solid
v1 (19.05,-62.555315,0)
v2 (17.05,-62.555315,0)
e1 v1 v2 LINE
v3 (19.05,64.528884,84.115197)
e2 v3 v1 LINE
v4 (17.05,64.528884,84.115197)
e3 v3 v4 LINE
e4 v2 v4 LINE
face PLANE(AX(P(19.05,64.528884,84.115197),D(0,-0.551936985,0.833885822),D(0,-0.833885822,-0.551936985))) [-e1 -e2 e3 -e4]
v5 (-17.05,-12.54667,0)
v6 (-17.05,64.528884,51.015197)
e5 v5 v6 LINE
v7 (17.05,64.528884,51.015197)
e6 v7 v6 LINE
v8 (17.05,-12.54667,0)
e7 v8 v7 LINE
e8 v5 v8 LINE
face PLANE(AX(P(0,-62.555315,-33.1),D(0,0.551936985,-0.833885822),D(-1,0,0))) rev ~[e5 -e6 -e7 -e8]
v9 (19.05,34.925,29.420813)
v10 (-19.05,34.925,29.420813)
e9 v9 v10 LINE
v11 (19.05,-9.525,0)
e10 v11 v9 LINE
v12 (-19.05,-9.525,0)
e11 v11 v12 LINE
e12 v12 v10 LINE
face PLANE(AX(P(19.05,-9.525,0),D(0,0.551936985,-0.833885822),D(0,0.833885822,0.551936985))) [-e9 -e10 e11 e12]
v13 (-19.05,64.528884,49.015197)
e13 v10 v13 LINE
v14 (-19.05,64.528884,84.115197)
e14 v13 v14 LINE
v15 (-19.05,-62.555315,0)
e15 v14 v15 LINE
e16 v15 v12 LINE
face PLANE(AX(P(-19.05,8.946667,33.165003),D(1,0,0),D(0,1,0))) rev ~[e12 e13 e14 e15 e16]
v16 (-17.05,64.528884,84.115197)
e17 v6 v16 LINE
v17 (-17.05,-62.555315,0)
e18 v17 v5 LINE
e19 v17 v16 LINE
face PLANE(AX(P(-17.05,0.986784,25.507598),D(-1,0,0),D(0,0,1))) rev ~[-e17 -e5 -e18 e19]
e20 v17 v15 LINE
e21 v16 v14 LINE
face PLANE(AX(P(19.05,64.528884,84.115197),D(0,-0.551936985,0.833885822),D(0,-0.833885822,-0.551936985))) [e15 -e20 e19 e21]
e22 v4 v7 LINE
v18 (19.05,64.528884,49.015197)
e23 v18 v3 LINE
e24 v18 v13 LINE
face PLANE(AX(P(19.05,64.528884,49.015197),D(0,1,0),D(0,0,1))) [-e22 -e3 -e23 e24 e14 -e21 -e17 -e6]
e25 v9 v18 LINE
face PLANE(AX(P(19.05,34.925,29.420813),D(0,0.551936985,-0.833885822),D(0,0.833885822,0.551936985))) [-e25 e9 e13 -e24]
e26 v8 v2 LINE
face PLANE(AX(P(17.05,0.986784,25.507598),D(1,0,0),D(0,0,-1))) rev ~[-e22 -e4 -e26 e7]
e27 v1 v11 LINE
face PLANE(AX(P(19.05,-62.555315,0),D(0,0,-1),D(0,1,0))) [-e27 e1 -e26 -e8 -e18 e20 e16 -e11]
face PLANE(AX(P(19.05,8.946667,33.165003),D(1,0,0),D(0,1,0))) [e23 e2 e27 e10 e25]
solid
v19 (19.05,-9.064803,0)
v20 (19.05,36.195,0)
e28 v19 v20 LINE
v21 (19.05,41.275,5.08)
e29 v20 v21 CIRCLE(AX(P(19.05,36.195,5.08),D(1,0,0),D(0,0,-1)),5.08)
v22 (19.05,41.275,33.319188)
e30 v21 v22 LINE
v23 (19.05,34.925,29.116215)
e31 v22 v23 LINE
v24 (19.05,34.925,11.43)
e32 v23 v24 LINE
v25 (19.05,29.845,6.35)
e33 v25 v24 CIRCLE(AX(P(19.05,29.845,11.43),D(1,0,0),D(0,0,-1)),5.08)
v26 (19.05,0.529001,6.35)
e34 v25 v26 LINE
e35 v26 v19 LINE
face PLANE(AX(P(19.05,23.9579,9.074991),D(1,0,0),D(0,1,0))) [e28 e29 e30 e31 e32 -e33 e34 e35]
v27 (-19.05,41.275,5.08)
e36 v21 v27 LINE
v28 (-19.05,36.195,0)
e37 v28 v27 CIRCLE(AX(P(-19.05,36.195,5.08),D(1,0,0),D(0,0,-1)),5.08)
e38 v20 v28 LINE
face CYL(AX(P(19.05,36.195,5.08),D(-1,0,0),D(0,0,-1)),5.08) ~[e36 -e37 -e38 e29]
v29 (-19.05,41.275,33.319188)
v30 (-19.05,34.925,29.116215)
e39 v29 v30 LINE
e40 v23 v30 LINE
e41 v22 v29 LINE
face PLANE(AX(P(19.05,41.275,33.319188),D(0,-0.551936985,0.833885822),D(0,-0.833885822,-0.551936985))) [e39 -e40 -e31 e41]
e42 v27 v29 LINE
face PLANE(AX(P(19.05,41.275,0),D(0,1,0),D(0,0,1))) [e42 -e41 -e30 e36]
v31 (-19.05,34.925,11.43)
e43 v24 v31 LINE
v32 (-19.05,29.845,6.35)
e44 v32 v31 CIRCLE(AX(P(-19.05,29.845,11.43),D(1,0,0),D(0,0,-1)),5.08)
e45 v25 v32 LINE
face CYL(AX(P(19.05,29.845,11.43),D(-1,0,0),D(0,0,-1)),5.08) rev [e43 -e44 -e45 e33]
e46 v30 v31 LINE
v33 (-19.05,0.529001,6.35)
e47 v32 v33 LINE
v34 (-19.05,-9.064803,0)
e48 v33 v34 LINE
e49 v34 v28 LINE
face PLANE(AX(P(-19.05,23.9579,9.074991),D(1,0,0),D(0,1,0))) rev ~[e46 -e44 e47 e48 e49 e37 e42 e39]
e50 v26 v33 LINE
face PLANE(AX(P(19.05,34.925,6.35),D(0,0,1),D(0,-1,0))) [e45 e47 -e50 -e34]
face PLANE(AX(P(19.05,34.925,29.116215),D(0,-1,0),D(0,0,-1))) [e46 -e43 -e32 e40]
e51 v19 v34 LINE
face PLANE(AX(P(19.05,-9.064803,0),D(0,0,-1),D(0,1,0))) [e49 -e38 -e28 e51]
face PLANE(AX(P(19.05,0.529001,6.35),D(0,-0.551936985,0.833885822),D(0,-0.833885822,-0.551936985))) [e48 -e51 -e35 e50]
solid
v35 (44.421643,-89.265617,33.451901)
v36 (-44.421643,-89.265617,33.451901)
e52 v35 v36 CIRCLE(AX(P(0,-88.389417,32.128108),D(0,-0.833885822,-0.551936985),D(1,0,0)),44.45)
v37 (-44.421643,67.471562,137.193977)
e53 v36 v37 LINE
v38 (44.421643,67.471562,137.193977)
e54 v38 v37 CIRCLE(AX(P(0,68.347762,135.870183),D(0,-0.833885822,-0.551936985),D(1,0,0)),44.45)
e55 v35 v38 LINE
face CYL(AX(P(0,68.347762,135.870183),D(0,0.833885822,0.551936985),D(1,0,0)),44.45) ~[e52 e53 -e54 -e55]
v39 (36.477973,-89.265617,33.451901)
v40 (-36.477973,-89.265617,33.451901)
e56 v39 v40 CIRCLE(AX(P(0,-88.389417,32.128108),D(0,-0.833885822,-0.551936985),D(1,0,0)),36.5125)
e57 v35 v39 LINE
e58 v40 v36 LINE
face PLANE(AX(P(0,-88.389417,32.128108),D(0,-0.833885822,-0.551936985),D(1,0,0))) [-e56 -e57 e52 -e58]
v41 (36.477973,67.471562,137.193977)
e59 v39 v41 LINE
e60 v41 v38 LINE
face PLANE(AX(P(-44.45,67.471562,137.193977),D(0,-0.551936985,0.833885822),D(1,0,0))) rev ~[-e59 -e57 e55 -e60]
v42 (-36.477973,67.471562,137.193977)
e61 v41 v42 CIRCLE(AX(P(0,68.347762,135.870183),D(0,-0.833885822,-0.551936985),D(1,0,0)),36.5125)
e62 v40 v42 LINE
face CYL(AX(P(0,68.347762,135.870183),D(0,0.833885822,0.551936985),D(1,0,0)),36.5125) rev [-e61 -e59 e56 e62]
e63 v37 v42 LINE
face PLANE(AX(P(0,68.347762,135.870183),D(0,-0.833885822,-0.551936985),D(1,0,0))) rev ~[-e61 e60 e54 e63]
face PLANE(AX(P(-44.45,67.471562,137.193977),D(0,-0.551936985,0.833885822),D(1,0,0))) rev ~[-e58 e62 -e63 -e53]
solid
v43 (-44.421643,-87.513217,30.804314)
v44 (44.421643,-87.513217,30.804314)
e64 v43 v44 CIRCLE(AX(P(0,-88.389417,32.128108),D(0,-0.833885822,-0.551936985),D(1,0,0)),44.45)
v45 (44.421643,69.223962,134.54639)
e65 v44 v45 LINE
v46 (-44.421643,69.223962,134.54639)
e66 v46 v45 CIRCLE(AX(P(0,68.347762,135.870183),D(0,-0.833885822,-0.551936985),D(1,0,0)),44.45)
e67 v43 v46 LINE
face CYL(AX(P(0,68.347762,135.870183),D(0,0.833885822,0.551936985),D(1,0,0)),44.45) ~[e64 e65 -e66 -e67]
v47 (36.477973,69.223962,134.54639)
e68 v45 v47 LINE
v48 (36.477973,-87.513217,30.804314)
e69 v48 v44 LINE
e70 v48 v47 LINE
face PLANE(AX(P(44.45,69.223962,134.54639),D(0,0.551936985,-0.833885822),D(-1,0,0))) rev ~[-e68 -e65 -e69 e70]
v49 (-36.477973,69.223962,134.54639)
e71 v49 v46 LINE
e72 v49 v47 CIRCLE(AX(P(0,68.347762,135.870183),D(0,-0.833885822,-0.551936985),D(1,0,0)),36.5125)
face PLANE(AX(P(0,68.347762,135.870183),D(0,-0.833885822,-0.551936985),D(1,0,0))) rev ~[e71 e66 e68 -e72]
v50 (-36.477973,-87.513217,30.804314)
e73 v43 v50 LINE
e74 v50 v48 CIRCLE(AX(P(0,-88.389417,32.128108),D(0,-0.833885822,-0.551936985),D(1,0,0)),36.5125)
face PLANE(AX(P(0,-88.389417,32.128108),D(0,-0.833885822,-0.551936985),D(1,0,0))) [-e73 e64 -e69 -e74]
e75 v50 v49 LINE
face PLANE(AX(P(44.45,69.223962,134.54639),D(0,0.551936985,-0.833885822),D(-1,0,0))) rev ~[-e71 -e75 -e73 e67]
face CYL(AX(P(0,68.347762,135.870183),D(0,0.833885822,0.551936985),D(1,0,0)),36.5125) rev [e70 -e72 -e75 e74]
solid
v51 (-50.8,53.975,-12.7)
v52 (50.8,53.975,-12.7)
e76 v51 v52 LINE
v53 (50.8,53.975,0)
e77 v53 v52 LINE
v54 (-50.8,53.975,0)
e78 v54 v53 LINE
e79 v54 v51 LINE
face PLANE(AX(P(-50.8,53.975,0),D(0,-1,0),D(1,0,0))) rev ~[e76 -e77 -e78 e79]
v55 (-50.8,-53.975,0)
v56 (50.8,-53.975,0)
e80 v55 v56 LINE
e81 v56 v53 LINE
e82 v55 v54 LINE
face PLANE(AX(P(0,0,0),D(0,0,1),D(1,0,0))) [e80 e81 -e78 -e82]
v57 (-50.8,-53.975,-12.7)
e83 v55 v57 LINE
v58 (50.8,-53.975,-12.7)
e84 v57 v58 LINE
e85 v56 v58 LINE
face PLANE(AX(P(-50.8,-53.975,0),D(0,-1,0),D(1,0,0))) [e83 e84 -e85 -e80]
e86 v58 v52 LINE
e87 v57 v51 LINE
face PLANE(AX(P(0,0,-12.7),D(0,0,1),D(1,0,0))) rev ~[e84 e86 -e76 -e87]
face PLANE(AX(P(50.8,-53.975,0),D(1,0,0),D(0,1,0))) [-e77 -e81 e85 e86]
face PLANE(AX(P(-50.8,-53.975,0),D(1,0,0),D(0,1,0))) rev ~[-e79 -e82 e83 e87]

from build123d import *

# Parameters (mm, degrees)
F0_W      = 101.6
F0_H      = 107.95
F1_DEPTH  = 12.7
F4_DEPTH  = 38.1
F5_W      = 34.1
F5_H      = 33.1
F7_R      = 5.08
F10_R     = 44.45
F10_R_2   = 36.5125
F11_DEPTH = 187.96
F13_DEPTH = 233.1615109833


with BuildPart() as f1:
    # F0 (on Top) → F1 (new body)
    with BuildSketch(Plane.XY):
        Rectangle(F0_W, F0_H)
    extrude(amount=-F1_DEPTH)


with BuildPart() as f4:
    # F3 (on offset) → F4 (new body)
    with BuildSketch(Plane.YZ.offset(19.05)):
        Polygon((64.5288839872, 84.1151965616), (-62.5553152959, 0), (-9.525, 0), (34.925, 29.4208131951), (41.275, 33.6237865087), (64.5288839872, 49.0151965616), align=None)
    extrude(amount=-F4_DEPTH)

    # F6: sweep along a path in F6_path
    with BuildLine(Plane(origin=(19.05, -62.5553152959, 0), x_dir=(0, -0.8338858221, -0.5519369853), z_dir=(0, 0.5519369853, -0.8338858221))) as f6_path:
        Line((0, 0), (-152.4, 0))
    # F5 (on face) → F6 (sweep, cut)
    with BuildSketch(Plane(origin=(0, 64.5288839872, 0), x_dir=(-1, 0, 0), z_dir=(0, 1, 0))):
        with Locations((0, 67.5651965616)):
            Rectangle(F5_W, F5_H)
    sweep(path=f6_path.line, mode=Mode.SUBTRACT)


with BuildPart() as f4b:
    # F3 (on offset) → F4, piece 2 (new body)
    with BuildSketch(Plane.YZ.offset(19.05)):
        Polygon((34.925, 6.35), (0.5290009418, 6.35), (-9.0648025377, 0), (41.275, 0), (41.275, 33.3191884531), (34.925, 29.1162151395), align=None)
    extrude(amount=-F4_DEPTH)

    # F7
    f7_edges = [f4b.edges().sort_by_distance(p)[0] for p in [
        (0, 41.275, 0),
        (0, 34.925, 6.35),
    ]]
    fillet(f7_edges, radius=F7_R)


with BuildPart() as f11:
    # F10 (on face) → F11 (new body)
    with BuildSketch(Plane(origin=(0, 110.0612620164, 72.8479601757), x_dir=(1, 0, 0), z_dir=(0, -0.8338858221, -0.5519369853))):
        with Locations((0, 75.576561689)):
            Circle(F10_R)
        with Locations((0, 75.576561689)):
            Circle(F10_R_2, mode=Mode.SUBTRACT)
    extrude(amount=F11_DEPTH)

    # F12 (on face) → F13 (cut, through all)
    with BuildSketch(Plane(origin=(0, 110.0612620164, 72.8479601757), x_dir=(-1, 0, 0), z_dir=(0, 0.8338858221, 0.5519369853))):
        Polygon((-44.45, 77.164061689), (-44.45, 75.576561689), (-44.45, 73.989061689), (0, 73.989061689), (44.45, 73.989061689), (44.45, 75.576561689), (44.45, 77.164061689), (0, 77.164061689), align=None)
    extrude(amount=-F13_DEPTH, mode=Mode.SUBTRACT)


solid = Compound([f1.part, f4.part, f4b.part, f11.part])
